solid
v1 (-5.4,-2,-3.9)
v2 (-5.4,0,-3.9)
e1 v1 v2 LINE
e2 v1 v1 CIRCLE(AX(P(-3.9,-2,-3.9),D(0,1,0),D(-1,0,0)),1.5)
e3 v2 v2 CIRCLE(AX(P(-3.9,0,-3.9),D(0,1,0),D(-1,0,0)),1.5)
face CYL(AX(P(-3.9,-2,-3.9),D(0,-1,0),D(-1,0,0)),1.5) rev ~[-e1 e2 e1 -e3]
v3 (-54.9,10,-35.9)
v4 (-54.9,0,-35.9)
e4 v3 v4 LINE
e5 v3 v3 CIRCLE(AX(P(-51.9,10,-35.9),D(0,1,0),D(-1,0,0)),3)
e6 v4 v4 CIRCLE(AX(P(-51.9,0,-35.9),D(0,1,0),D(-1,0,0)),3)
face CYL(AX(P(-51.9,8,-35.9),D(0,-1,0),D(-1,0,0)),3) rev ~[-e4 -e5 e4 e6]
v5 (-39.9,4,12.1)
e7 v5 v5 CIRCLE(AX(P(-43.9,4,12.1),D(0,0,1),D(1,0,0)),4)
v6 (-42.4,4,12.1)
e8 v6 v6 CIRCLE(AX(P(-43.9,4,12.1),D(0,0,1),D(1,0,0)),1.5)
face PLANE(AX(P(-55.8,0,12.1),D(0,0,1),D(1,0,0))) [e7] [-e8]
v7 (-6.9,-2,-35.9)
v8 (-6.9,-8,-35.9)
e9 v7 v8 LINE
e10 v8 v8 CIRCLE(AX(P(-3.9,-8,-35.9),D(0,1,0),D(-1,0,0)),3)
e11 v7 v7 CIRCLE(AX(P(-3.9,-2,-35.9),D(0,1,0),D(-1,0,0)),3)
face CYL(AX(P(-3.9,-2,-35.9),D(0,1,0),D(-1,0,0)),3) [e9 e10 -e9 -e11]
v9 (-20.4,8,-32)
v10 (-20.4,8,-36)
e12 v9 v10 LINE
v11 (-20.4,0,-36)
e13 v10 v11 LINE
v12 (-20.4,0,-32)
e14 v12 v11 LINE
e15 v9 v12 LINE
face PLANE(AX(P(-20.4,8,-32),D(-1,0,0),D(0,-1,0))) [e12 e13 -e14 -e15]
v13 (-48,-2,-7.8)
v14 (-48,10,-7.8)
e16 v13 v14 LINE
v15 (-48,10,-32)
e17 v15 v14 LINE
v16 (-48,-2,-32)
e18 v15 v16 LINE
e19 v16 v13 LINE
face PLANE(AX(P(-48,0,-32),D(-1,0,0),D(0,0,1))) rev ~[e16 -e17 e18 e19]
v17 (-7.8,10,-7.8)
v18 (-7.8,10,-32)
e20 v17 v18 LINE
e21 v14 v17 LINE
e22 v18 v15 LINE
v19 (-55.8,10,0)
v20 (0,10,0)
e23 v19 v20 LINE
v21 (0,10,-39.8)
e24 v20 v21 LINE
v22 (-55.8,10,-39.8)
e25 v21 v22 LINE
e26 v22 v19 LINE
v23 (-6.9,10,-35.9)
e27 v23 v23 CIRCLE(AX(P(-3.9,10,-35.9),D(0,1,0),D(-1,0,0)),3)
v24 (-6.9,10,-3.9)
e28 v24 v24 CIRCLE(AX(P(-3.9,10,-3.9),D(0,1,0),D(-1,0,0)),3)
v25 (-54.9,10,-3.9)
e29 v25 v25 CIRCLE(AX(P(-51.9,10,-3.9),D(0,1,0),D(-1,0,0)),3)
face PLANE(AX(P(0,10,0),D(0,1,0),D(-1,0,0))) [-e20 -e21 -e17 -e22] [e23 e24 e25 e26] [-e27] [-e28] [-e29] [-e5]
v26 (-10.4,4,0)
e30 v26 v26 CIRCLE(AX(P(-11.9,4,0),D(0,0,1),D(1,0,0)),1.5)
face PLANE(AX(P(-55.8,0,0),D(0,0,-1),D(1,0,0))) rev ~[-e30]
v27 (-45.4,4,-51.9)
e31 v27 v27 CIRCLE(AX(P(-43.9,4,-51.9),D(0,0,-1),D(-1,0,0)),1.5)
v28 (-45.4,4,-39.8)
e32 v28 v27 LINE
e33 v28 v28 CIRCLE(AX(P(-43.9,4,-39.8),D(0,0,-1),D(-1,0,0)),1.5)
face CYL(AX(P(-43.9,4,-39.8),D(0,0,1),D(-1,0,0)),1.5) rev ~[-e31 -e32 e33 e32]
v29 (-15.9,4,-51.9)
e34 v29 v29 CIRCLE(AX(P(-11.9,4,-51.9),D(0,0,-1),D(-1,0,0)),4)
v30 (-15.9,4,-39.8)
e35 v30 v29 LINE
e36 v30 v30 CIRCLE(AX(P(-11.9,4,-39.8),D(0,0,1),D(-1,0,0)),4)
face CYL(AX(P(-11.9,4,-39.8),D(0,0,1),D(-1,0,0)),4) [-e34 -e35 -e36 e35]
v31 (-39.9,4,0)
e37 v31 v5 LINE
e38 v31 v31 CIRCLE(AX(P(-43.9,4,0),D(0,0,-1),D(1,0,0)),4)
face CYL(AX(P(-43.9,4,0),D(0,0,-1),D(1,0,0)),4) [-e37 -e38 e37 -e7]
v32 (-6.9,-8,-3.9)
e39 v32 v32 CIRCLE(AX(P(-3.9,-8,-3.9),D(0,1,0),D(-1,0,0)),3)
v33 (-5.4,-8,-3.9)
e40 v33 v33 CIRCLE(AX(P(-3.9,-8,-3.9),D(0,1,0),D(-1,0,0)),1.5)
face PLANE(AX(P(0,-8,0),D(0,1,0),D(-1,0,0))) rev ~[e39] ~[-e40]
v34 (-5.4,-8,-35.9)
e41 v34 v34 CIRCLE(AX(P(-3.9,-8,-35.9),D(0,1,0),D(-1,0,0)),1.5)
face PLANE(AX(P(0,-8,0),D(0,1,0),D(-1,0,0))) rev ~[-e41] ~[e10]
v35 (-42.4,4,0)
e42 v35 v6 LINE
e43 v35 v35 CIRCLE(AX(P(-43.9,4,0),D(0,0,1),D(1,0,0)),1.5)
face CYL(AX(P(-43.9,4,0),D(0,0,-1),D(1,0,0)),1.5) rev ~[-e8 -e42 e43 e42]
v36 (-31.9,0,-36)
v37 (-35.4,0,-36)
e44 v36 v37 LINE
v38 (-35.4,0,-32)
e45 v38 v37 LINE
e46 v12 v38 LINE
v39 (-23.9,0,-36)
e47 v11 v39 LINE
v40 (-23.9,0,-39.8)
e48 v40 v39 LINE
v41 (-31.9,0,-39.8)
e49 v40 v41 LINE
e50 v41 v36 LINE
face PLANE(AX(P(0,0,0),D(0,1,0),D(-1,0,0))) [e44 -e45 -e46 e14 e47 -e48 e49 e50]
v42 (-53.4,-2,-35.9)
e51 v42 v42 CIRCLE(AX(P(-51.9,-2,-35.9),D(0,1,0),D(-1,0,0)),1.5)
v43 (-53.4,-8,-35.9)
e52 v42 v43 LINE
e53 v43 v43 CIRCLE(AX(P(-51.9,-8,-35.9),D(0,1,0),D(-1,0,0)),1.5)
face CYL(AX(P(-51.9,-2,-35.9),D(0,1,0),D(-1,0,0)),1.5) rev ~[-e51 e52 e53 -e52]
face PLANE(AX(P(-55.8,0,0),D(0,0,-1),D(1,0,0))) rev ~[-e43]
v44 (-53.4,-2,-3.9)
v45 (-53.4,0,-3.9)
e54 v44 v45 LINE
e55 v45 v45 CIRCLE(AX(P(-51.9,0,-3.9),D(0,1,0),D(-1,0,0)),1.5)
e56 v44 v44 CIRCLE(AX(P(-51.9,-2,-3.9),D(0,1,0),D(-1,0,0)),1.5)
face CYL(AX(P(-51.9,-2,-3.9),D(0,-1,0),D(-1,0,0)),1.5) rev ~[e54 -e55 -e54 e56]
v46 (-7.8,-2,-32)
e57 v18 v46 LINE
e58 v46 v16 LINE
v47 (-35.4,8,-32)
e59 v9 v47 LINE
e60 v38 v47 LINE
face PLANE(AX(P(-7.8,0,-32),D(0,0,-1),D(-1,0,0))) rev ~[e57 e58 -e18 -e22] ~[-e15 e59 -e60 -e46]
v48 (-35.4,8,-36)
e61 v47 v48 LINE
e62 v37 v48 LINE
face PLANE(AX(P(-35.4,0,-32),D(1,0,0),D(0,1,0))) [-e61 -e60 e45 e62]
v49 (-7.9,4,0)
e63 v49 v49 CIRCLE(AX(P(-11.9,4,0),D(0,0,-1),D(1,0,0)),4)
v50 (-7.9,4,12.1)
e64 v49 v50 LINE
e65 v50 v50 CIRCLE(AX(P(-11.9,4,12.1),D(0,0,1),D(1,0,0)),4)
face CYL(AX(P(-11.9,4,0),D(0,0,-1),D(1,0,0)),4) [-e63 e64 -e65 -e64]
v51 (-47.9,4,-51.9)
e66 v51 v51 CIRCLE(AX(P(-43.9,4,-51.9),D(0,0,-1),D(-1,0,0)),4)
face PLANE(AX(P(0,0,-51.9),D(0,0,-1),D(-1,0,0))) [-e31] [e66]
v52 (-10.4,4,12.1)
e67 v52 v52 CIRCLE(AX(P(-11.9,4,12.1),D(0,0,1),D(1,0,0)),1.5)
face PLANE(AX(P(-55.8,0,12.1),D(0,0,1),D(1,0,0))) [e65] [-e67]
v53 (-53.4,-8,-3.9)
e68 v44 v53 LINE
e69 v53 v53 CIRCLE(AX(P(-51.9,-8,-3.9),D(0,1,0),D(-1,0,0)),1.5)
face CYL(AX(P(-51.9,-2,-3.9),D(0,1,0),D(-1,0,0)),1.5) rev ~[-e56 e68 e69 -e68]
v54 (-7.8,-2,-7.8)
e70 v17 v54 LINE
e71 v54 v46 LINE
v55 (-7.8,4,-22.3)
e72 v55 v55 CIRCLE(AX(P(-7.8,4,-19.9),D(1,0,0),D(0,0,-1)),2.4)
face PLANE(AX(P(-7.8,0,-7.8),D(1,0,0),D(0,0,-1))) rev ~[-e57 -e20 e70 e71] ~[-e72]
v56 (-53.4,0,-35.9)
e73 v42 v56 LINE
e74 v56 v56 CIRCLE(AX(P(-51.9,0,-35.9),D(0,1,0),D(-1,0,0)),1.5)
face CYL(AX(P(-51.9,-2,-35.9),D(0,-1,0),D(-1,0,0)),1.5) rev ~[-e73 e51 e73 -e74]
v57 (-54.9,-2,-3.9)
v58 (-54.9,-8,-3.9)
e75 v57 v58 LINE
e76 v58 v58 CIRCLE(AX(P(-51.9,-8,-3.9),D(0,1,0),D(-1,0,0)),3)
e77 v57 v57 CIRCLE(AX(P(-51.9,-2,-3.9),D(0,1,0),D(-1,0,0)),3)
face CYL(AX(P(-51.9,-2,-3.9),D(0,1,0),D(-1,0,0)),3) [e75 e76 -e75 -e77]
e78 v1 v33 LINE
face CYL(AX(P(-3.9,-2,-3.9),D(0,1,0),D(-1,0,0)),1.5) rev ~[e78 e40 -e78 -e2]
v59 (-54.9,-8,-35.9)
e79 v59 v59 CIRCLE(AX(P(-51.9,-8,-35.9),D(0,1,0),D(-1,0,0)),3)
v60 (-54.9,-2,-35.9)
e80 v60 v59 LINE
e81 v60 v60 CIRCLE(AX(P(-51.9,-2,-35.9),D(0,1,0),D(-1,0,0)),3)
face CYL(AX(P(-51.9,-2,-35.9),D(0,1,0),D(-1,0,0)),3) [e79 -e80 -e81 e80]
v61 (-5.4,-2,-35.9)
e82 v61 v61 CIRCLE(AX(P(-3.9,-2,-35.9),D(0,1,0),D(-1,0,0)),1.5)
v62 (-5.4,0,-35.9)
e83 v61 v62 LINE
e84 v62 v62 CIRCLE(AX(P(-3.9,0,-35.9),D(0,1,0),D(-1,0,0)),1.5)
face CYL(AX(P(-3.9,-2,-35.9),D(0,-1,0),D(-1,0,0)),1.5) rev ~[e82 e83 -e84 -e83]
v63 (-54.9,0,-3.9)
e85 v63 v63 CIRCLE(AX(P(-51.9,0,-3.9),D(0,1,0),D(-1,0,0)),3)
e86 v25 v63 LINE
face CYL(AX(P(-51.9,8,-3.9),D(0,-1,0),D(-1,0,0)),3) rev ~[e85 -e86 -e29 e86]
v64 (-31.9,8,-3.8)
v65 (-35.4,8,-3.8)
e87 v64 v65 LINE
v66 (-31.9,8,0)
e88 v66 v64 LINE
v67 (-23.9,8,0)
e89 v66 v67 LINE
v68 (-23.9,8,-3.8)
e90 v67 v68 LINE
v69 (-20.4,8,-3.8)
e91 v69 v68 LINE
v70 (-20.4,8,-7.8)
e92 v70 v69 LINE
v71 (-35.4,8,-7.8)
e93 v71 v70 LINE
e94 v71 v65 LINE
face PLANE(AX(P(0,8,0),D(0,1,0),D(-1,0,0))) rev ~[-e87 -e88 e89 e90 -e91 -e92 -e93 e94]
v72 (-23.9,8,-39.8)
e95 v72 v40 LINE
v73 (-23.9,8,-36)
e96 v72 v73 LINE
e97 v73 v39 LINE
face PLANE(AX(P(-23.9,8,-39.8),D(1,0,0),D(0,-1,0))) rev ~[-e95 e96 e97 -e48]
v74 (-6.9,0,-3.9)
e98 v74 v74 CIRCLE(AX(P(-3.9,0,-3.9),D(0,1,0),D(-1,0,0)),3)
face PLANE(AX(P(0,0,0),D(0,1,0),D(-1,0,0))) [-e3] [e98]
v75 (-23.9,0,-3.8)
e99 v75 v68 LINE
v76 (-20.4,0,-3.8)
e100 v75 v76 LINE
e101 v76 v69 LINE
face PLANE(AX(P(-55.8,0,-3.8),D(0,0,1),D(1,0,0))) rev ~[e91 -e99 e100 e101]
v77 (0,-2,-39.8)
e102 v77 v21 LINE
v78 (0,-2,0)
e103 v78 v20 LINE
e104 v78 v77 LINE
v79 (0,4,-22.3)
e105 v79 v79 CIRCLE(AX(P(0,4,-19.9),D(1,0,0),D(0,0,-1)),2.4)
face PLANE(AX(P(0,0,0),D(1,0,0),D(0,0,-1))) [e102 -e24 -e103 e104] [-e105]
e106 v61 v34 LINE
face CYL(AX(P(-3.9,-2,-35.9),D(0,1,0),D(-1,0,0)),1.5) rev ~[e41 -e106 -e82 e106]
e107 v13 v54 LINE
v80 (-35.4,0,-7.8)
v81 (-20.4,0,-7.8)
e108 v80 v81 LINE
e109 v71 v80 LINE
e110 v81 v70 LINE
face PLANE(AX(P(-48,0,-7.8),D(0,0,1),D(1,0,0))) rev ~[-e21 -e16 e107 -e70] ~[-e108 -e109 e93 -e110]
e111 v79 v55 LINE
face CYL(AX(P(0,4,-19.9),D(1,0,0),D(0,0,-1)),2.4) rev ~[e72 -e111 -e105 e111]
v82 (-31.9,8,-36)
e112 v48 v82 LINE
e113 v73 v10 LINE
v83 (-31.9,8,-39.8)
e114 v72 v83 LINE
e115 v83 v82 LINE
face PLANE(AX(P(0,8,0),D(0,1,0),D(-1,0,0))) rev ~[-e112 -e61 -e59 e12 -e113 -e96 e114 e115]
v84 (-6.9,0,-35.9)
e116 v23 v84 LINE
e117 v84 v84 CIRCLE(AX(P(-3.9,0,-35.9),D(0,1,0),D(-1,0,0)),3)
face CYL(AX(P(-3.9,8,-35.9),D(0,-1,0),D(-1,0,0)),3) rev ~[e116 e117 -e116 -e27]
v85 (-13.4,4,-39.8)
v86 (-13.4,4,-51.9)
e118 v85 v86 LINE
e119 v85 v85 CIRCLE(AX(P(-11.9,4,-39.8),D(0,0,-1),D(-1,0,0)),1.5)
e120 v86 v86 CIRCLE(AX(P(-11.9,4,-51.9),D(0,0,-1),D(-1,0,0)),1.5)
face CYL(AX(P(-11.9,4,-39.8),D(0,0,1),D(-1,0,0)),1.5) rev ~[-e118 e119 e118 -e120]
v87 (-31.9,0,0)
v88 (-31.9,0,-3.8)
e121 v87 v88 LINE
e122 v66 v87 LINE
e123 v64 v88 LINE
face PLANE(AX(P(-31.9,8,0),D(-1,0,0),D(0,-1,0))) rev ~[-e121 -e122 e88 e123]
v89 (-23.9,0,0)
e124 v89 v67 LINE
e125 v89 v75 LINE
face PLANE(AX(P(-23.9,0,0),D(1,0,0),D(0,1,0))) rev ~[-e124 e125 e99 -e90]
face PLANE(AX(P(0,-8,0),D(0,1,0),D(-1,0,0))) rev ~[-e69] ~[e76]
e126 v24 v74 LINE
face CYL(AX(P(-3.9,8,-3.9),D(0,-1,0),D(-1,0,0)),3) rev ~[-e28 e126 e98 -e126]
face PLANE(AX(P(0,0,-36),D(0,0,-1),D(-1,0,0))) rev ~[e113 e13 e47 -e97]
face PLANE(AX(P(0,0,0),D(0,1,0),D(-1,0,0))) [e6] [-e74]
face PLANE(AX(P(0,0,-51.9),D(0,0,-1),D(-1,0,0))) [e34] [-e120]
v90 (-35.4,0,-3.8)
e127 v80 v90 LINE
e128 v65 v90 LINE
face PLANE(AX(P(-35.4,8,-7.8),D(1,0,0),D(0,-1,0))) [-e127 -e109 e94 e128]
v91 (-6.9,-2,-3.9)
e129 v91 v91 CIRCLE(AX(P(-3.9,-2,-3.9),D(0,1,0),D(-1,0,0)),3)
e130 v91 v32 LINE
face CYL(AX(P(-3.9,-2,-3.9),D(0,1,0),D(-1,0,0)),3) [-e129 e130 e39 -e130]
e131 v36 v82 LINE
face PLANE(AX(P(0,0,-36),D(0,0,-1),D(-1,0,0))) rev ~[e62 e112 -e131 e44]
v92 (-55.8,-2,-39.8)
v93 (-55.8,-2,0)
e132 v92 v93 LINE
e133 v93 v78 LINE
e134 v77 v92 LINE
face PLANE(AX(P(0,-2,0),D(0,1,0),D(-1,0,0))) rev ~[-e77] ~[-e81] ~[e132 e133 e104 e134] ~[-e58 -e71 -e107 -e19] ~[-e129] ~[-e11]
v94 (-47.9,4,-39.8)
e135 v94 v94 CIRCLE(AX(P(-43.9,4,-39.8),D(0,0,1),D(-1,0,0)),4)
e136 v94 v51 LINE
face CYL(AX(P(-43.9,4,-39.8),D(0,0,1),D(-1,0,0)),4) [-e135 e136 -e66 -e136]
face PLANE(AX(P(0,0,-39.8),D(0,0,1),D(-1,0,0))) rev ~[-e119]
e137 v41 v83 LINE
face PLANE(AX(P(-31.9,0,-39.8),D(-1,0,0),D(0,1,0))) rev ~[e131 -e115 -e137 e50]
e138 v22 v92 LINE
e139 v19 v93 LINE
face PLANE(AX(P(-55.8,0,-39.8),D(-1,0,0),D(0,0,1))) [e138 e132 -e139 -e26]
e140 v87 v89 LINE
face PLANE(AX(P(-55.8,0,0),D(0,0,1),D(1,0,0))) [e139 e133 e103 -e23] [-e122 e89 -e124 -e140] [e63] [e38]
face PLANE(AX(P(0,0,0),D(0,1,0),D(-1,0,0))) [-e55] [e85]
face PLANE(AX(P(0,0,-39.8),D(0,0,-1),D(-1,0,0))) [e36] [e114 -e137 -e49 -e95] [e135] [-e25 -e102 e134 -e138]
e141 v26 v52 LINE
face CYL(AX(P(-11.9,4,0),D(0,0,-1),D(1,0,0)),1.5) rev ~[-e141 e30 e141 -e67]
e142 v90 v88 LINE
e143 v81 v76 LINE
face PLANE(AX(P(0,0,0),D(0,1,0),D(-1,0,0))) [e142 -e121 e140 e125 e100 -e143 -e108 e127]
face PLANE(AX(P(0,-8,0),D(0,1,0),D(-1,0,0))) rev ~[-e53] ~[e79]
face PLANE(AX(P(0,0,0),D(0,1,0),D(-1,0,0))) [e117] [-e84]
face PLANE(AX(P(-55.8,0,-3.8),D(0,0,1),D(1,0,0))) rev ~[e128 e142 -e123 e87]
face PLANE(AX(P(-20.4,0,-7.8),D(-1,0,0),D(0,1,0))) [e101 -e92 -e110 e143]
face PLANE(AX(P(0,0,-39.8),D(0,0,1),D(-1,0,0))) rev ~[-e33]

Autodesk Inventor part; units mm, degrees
ref_plane "YZ Plane" through (0, 0, 0) normal (1, 0, 0) x (0, 1, 0)
ref_plane "XZ Plane" through (0, 0, 0) normal (0, 1, 0) x (-1, 0, 0)
ref_plane "XY Plane" through (0, 0, 0) normal (0, 0, 1) x (1, 0, 0)
sketch "Sketch1" plane through (0, 0, 0) normal (0, 1, 0) x (-1, 0, 0)
  line L0 (0, 0) -> (0, -39.8)
  line L1 (0, -39.8) -> (55.8, -39.8)
  line L2 (55.8, -39.8) -> (55.8, 0)
  line L3 (55.8, 0) -> (0, 0)
  line L4 (7.8, -7.8) -> (7.8, -32)
  line L5 (7.8, -32) -> (48, -32)
  line L6 (48, -32) -> (48, -7.8)
  line L7 (48, -7.8) -> (7.8, -7.8)
  line L8 (3.9, -3.9) -> (3.9, -35.9) construction
  line L9 (3.9, -35.9) -> (51.9, -35.9) construction
  line L10 (51.9, -35.9) -> (51.9, -3.9) construction
  line L11 (51.9, -3.9) -> (3.9, -3.9) construction
  circle A0 centre (3.9, -3.9) radius 1.5
  circle A1 centre (3.9, -35.9) radius 1.5
  circle A2 centre (51.9, -3.9) radius 1.5
  circle A3 centre (51.9, -35.9) radius 1.5
  circle A4 centre (3.9, -35.9) radius 3
  circle A5 centre (3.9, -3.9) radius 3
  circle A6 centre (51.9, -3.9) radius 3
  circle A7 centre (51.9, -35.9) radius 3
  dimension "d0" = 39.8
  dimension "d1" = 55.8
  dimension "d4" = 24.2
  dimension "d5" = 40.2
  dimension "d6" = 7.8
  dimension "d7" = 7.8
  dimension "d8" = 32
  dimension "d9" = 48
  dimension "d10" = 3.9
  dimension "d11" = 3.9
  dimension "d12" = 3
  dimension "d14" = 3
  dimension "d15" = 3
  dimension "d16" = 3
  dimension "d17" = 6
  dimension "d19" = 6
  dimension "d20" = 6
  dimension "d22" = 6
extrude "Extrusion1" add sketch "Sketch1" along normal blind 8 contours L3 L2 L1 L0
extrude "Extrusion13" add sketch "Sketch1" along normal blind 2 from surface at 8 separate body contours L3 L2 L1 L0
extrude "Extrusion12" add sketch "Sketch1" against normal blind 2 separate body contours L3 L2 L1 L0
extrude "Extrusion2" add sketch "Sketch1" along normal blind 2 from surface at -2 contours A4 | A5 | A6 | A7 bodies 1
extrude "Extrusion3" add sketch "Sketch1" against normal blind 6 from surface at -2 contours A4 | A5 | A6 | A7 bodies 1
sketch "Sketch2" plane through (0, 0, 0) normal (1, 0, 0) x (0, 0, -1)
  line L0 (0, 0) -> (0, 8) construction
  line L1 (0, 8) -> (39.8, 8) construction
  line L2 (39.8, 0) -> (39.8, 8) construction
  line L3 (0, 0) -> (39.8, 0) construction
  line L4 (0, 4) -> (39.8, 4) construction
  line L5 (19.9, 8) -> (19.9, 0) construction
  circle A0 centre (19.9, 4) radius 2.4
  dimension "d30" = 4.8
extrude "Extrusion4" cut sketch "Sketch2" against normal up to surface (7.8 mm away) bodies 1
sketch "Sketch3" plane through (0, 0, -39.8) normal (0, 0, -1) x (-1, 0, 0)
  line L0 (0, 8) -> (55.8, 8) construction
  line L1 (0, 0) -> (0, 8) construction
  line L2 (0, 0) -> (55.8, 0) construction
  line L3 (55.8, 0) -> (55.8, 8) construction
  line L4 (27.9, 8) -> (27.9, 0) construction
  line L5 (0, 4) -> (55.8, 4) construction
  circle A0 centre (11.9, 4) radius 4
  circle A1 centre (11.9, 4) radius 1.5
  circle A2 centre (43.9, 4) radius 4
  circle A3 centre (43.9, 4) radius 1.5
  line L6 (20.4, 0) -> (35.4, 0)
  line L7 (35.4, 0) -> (35.4, 8)
  line L8 (35.4, 8) -> (20.4, 8)
  line L9 (20.4, 8) -> (20.4, 0)
  line L10 (27.9, 8) -> (27.9, 0) construction
  line L11 (20.4, 4) -> (35.4, 4) construction
  line L12 (23.9, 8) -> (23.9, 0)
  line L13 (31.9, 0) -> (31.9, 8)
  point P0 (27.9, 4)
  dimension "d34" = 16
  dimension "d35" = 8
  dimension "d36" = 3
  dimension "d49" = 15
  dimension "d50" = 8
  dimension "d55" = 4
  dimension "d56" = 4
extrude "Extrusion10" cut sketch "Sketch3" against normal up to surface (7.8 mm away) contours L12 L8 L13 L6 bodies 1
extrude "Extrusion9" cut sketch "Sketch3" along normal blind 4 from surface at -7.8 contours L9 L8 L12 L6 | L13 L8 L7 L6 bodies 1
extrude "Extrusion6" add sketch "Sketch3" along normal blind 12.1 contours A0 | A2 bodies 1
sketch "Sketch4" plane through (-55.8, 0, 0) normal (0, 0, 1) x (1, 0, 0)
  line L0 (0, 8) -> (55.8, 8) construction
  line L1 (0, 0) -> (0, 8) construction
  line L2 (0, 0) -> (55.8, 0) construction
  line L3 (55.8, 0) -> (55.8, 8) construction
  line L4 (27.9, 8) -> (27.9, 0) construction
  line L5 (0, 4) -> (55.8, 4) construction
  circle A0 centre (11.9, 4) radius 4
  circle A1 centre (11.9, 4) radius 1.5
  circle A2 centre (43.9, 4) radius 4
  circle A3 centre (43.9, 4) radius 1.5
  line L6 (20.4, 0) -> (35.4, 0)
  line L7 (35.4, 0) -> (35.4, 8)
  line L8 (35.4, 8) -> (20.4, 8)
  line L9 (20.4, 8) -> (20.4, 0)
  line L10 (27.9, 8) -> (27.9, 0) construction
  line L11 (20.4, 4) -> (35.4, 4) construction
  line L12 (23.9, 8) -> (23.9, 0)
  line L13 (31.9, 0) -> (31.9, 8)
  line L14 (0, 8) -> (55.8, 8) construction
  line L15 (0, 0) -> (0, 8) construction
  line L16 (0, 0) -> (55.8, 0) construction
  line L17 (55.8, 0) -> (55.8, 8) construction
  point P0 (27.9, 4)
  dimension "d59" = 16
  dimension "d60" = 8
  dimension "d61" = 3
  dimension "d62" = 15
  dimension "d63" = 8
  dimension "d64" = 4
  dimension "d65" = 4
extrude "Extrusion7" cut sketch "Sketch4" against normal up to surface (7.8 mm away) contours L12 L8 L13 L6 bodies 1
extrude "Extrusion11" cut sketch "Sketch4" along normal blind 4 from surface at -7.8 contours L9 L8 L12 L6 | L13 L8 L7 L6 bodies 1
extrude "Extrusion8" add sketch "Sketch4" along normal blind 12.1 contours A0 | A2 bodies 1
combine bodies "Combine1" operation type add bodies to combine 1 3 2
equation "\"d7\" = d6"
equation "\"d10\" = 0.5 * d6"
equation "\"d11\" = 0.5 * d6"
equation "\"d12\" = d14"
equation "\"d15\" = d14"
equation "\"d16\" = d14"
equation "\"d19\" = d17"
equation "\"d20\" = d21"
equation "\"d22\" = d23"
equation "\"d55\" = 0.5 * d50"
equation "\"d56\" = 0.5 * d50"
equation "\"d64\" = 0.5 * d63"
equation "\"d65\" = 0.5 * d63"
equation "\"d21\" = 6"
equation "\"d23\" = 6"
properties part number "diff_gear_holder"
